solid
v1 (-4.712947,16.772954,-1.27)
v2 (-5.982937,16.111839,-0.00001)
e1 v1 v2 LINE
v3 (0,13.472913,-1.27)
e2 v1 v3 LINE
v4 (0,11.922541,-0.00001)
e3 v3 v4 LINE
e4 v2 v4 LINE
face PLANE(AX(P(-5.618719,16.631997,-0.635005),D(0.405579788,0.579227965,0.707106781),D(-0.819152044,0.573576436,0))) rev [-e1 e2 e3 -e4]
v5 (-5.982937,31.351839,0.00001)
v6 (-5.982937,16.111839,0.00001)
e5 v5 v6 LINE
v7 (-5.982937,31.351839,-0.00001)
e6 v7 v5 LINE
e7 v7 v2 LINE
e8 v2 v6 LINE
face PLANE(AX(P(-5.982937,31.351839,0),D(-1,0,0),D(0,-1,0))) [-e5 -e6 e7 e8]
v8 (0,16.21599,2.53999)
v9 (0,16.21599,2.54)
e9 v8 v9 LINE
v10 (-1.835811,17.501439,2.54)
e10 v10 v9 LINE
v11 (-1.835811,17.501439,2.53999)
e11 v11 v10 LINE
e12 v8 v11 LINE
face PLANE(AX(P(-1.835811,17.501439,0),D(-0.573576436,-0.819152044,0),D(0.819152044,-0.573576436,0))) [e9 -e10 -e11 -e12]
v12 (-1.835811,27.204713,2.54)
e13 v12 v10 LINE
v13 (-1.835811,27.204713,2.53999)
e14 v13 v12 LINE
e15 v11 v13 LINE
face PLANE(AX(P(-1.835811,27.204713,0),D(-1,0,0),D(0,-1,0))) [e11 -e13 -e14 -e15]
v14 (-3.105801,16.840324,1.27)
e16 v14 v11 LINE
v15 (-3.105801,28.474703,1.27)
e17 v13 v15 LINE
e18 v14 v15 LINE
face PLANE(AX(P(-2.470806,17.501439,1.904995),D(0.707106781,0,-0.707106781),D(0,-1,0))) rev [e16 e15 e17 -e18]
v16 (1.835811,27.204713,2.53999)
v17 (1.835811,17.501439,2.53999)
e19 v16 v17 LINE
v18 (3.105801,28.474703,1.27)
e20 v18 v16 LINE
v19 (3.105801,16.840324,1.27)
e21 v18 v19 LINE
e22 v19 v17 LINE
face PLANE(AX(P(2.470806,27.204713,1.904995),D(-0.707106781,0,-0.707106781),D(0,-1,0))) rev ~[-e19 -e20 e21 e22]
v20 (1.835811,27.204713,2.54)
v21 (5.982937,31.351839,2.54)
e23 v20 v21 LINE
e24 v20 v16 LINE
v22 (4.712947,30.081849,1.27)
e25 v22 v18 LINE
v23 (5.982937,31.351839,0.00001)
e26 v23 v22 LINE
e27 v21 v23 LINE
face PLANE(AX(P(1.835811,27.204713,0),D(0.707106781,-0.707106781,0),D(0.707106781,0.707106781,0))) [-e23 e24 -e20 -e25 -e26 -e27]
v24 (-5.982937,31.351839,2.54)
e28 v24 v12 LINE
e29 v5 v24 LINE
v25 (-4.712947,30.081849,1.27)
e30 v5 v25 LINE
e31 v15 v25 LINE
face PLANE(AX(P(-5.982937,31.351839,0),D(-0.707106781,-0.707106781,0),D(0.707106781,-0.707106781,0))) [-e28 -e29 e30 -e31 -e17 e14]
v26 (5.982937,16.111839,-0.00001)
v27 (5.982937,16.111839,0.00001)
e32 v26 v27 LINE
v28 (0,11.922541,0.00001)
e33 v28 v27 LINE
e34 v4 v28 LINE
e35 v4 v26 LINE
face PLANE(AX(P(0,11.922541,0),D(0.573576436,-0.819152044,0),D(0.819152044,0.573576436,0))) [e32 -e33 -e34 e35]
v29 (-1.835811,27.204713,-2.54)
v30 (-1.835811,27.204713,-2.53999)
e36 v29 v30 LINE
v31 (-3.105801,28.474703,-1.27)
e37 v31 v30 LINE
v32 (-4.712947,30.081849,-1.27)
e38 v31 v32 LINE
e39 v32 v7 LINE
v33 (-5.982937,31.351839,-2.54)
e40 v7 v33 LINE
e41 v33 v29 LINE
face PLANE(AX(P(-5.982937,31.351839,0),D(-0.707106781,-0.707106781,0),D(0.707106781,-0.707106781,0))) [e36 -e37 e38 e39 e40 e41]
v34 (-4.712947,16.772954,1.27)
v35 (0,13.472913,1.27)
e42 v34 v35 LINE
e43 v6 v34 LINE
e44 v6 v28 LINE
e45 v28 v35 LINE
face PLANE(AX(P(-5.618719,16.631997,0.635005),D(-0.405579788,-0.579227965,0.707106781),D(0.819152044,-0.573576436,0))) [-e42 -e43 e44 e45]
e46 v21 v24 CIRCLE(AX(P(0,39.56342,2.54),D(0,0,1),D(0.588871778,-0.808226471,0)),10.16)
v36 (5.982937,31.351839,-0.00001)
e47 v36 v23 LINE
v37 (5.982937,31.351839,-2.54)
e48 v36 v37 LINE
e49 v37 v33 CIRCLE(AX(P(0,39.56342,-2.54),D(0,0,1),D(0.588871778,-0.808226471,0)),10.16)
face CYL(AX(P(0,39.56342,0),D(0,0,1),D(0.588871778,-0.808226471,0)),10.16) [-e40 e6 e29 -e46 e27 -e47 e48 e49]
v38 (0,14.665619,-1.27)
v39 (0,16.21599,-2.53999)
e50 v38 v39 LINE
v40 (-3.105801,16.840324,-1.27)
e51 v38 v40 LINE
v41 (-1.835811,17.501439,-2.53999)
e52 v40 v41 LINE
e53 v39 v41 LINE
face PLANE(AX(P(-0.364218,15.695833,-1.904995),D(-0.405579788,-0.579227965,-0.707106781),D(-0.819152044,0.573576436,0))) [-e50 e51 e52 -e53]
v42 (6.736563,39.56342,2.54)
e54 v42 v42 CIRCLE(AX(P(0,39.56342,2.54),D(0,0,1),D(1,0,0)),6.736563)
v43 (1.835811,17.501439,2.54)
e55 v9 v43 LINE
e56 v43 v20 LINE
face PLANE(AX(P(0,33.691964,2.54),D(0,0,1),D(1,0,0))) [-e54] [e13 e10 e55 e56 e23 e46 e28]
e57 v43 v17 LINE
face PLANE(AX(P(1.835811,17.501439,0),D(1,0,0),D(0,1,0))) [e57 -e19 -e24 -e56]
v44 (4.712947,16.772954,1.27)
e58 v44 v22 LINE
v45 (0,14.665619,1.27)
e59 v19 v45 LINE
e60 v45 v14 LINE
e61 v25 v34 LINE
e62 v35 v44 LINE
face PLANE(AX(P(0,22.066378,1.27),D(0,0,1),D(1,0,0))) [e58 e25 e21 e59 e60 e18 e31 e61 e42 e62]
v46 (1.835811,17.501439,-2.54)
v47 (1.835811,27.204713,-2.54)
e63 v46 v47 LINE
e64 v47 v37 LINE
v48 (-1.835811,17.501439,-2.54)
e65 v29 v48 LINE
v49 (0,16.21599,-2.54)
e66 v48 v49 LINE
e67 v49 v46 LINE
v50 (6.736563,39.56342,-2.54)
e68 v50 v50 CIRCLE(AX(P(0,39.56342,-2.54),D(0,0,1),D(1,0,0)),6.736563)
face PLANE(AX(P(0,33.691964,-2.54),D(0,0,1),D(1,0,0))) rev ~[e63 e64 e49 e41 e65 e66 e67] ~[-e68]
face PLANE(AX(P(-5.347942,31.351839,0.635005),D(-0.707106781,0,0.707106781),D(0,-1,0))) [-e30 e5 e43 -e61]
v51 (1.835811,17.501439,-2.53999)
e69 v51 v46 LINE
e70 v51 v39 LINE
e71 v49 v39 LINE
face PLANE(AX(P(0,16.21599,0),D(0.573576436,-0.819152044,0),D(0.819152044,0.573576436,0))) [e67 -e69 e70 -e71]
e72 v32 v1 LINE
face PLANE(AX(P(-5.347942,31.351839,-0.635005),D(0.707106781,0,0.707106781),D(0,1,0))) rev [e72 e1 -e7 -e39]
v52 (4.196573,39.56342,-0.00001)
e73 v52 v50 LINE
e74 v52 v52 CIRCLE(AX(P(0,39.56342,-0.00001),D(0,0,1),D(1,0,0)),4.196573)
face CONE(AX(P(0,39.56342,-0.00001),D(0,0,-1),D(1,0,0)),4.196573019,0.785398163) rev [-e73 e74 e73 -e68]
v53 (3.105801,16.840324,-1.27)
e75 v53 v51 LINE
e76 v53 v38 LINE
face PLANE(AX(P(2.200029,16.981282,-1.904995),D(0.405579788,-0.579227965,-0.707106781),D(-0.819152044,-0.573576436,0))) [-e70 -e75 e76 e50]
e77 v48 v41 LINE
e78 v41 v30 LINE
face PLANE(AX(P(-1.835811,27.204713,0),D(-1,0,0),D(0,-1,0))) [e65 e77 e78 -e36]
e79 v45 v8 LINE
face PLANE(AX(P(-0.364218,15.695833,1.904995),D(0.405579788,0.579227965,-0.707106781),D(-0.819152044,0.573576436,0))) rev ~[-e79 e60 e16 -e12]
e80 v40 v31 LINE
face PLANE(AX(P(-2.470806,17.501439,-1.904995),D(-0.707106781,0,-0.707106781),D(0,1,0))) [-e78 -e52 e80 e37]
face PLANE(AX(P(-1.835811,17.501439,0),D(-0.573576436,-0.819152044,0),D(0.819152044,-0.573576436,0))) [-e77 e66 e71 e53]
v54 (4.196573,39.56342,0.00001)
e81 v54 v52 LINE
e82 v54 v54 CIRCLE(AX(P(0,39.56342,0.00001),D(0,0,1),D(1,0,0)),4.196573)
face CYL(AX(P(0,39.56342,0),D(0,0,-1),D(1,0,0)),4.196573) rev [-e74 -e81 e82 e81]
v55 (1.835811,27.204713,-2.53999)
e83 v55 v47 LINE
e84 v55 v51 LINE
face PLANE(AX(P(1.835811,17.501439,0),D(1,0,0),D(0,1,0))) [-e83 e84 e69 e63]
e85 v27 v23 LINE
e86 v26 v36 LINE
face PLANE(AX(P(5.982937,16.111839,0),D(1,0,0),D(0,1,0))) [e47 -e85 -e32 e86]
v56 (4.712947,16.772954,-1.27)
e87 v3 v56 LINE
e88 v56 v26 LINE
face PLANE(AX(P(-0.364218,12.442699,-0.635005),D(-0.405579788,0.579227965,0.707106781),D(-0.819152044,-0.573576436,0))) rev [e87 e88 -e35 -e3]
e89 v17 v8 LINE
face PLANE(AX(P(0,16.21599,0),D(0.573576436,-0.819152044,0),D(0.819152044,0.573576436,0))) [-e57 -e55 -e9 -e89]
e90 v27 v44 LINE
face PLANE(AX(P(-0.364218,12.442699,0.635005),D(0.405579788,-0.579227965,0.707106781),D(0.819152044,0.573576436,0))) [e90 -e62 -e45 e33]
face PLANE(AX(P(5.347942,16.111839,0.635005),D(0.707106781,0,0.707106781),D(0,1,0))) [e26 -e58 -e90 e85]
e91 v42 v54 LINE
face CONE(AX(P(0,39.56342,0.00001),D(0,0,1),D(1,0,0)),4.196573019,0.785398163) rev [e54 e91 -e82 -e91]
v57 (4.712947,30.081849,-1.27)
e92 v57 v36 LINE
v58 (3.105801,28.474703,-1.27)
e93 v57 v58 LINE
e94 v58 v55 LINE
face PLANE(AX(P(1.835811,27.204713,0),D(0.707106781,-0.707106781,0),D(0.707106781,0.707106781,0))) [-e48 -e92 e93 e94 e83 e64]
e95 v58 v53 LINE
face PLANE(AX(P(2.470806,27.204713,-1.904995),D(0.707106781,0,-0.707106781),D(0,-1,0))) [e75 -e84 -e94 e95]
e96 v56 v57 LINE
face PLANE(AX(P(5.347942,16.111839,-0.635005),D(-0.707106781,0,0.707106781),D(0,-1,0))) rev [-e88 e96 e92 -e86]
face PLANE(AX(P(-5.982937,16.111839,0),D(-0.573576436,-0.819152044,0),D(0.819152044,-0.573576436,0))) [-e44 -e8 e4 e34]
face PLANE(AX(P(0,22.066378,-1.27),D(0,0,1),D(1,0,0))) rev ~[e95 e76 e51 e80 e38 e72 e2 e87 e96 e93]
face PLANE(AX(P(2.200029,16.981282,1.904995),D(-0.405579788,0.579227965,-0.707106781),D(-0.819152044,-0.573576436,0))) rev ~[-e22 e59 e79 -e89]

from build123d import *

# Parameters (mm, degrees)
F0_R     = 4.1965730186
F1_DEPTH = 2.54
F2_DEPTH = 1.27
F3_SIZE  = 1.26999
F4_SIZE  = 2.53999


# Not quite as in the source:
# - a fillet or chamfer is up to 0.001 mm smaller than in the source, because OpenCascade refuses the exact size


with BuildPart() as f1:
    # F0 (on Top) → F1 (new body, symmetric)
    with BuildSketch(Plane.XY):
        with BuildLine():
            ThreePointArc((0, 49.7234201631), (-9.6606227132, 42.7095239111), (-5.9829372688, 31.3518392168))
            Line((-5.9829372688, 31.3518392168), (-1.8358110683, 27.2047130163))
            Line((-1.8358110683, 27.2047130163), (-1.8358110683, 17.501438998))
            Line((-1.8358110683, 17.501438998), (0, 16.2159902493))
            Line((0, 16.2159902493), (1.8358110683, 17.501438998))
            Line((1.8358110683, 17.501438998), (1.8358110683, 27.2047130163))
            Line((1.8358110683, 27.2047130163), (5.9829372688, 31.3518392168))
            ThreePointArc((5.9829372688, 31.3518392168), (9.6606227132, 42.7095239111), (0, 49.7234201631))
        make_face()
        with Locations((0, 39.5634201631)):
            Circle(F0_R, mode=Mode.SUBTRACT)
    extrude(amount=F1_DEPTH, both=True)

    # F0 (on Top) → F2 (join, symmetric)
    with BuildSketch(Plane.XY):
        Polygon((-1.8358110683, 27.2047130163), (-5.9829372688, 31.3518392168), (-5.9829372688, 16.1118392168), (0, 11.9225414406), (5.9829372688, 16.1118392168), (5.9829372688, 31.3518392168), (1.8358110683, 27.2047130163), (1.8358110683, 17.501438998), (0, 16.2159902493), (-1.8358110683, 17.501438998), align=None)
    extrude(amount=F2_DEPTH, both=True)

    # F3 (size 1.27 in the source; OpenCascade refuses exactly that, so slightly less here)
    f3_edges = [f1.edges().sort_by_distance(p)[0] for p in [
        (0.917906, 16.858715, 1.27),
        (-0.917906, 16.858715, 1.27),
        (1.835811, 22.353076, 1.27),
        (-1.835811, 22.353076, 1.27),
        (5.982937, 23.731839, 1.27),
        (-5.982937, 23.731839, 1.27),
        (-2.991469, 14.01719, 1.27),
        (2.991469, 14.01719, 1.27),
        (2.991469, 14.01719, -1.27),
        (5.982937, 23.731839, -1.27),
        (0.917906, 16.858715, -1.27),
        (1.835811, 22.353076, -1.27),
        (-0.917906, 16.858715, -1.27),
        (-1.835811, 22.353076, -1.27),
        (-5.982937, 23.731839, -1.27),
        (-2.991469, 14.01719, -1.27),
    ]]
    chamfer(f3_edges, length=F3_SIZE)

    # F4 (size 2.54 in the source; OpenCascade refuses exactly that, so slightly less here)
    f4_edges = [f1.edges().sort_by_distance(p)[0] for p in [
        (-4.196573, 39.56342, 2.54),
        (-4.196573, 39.56342, -2.54),
    ]]
    chamfer(f4_edges, length=F4_SIZE)


solid = f1.part
